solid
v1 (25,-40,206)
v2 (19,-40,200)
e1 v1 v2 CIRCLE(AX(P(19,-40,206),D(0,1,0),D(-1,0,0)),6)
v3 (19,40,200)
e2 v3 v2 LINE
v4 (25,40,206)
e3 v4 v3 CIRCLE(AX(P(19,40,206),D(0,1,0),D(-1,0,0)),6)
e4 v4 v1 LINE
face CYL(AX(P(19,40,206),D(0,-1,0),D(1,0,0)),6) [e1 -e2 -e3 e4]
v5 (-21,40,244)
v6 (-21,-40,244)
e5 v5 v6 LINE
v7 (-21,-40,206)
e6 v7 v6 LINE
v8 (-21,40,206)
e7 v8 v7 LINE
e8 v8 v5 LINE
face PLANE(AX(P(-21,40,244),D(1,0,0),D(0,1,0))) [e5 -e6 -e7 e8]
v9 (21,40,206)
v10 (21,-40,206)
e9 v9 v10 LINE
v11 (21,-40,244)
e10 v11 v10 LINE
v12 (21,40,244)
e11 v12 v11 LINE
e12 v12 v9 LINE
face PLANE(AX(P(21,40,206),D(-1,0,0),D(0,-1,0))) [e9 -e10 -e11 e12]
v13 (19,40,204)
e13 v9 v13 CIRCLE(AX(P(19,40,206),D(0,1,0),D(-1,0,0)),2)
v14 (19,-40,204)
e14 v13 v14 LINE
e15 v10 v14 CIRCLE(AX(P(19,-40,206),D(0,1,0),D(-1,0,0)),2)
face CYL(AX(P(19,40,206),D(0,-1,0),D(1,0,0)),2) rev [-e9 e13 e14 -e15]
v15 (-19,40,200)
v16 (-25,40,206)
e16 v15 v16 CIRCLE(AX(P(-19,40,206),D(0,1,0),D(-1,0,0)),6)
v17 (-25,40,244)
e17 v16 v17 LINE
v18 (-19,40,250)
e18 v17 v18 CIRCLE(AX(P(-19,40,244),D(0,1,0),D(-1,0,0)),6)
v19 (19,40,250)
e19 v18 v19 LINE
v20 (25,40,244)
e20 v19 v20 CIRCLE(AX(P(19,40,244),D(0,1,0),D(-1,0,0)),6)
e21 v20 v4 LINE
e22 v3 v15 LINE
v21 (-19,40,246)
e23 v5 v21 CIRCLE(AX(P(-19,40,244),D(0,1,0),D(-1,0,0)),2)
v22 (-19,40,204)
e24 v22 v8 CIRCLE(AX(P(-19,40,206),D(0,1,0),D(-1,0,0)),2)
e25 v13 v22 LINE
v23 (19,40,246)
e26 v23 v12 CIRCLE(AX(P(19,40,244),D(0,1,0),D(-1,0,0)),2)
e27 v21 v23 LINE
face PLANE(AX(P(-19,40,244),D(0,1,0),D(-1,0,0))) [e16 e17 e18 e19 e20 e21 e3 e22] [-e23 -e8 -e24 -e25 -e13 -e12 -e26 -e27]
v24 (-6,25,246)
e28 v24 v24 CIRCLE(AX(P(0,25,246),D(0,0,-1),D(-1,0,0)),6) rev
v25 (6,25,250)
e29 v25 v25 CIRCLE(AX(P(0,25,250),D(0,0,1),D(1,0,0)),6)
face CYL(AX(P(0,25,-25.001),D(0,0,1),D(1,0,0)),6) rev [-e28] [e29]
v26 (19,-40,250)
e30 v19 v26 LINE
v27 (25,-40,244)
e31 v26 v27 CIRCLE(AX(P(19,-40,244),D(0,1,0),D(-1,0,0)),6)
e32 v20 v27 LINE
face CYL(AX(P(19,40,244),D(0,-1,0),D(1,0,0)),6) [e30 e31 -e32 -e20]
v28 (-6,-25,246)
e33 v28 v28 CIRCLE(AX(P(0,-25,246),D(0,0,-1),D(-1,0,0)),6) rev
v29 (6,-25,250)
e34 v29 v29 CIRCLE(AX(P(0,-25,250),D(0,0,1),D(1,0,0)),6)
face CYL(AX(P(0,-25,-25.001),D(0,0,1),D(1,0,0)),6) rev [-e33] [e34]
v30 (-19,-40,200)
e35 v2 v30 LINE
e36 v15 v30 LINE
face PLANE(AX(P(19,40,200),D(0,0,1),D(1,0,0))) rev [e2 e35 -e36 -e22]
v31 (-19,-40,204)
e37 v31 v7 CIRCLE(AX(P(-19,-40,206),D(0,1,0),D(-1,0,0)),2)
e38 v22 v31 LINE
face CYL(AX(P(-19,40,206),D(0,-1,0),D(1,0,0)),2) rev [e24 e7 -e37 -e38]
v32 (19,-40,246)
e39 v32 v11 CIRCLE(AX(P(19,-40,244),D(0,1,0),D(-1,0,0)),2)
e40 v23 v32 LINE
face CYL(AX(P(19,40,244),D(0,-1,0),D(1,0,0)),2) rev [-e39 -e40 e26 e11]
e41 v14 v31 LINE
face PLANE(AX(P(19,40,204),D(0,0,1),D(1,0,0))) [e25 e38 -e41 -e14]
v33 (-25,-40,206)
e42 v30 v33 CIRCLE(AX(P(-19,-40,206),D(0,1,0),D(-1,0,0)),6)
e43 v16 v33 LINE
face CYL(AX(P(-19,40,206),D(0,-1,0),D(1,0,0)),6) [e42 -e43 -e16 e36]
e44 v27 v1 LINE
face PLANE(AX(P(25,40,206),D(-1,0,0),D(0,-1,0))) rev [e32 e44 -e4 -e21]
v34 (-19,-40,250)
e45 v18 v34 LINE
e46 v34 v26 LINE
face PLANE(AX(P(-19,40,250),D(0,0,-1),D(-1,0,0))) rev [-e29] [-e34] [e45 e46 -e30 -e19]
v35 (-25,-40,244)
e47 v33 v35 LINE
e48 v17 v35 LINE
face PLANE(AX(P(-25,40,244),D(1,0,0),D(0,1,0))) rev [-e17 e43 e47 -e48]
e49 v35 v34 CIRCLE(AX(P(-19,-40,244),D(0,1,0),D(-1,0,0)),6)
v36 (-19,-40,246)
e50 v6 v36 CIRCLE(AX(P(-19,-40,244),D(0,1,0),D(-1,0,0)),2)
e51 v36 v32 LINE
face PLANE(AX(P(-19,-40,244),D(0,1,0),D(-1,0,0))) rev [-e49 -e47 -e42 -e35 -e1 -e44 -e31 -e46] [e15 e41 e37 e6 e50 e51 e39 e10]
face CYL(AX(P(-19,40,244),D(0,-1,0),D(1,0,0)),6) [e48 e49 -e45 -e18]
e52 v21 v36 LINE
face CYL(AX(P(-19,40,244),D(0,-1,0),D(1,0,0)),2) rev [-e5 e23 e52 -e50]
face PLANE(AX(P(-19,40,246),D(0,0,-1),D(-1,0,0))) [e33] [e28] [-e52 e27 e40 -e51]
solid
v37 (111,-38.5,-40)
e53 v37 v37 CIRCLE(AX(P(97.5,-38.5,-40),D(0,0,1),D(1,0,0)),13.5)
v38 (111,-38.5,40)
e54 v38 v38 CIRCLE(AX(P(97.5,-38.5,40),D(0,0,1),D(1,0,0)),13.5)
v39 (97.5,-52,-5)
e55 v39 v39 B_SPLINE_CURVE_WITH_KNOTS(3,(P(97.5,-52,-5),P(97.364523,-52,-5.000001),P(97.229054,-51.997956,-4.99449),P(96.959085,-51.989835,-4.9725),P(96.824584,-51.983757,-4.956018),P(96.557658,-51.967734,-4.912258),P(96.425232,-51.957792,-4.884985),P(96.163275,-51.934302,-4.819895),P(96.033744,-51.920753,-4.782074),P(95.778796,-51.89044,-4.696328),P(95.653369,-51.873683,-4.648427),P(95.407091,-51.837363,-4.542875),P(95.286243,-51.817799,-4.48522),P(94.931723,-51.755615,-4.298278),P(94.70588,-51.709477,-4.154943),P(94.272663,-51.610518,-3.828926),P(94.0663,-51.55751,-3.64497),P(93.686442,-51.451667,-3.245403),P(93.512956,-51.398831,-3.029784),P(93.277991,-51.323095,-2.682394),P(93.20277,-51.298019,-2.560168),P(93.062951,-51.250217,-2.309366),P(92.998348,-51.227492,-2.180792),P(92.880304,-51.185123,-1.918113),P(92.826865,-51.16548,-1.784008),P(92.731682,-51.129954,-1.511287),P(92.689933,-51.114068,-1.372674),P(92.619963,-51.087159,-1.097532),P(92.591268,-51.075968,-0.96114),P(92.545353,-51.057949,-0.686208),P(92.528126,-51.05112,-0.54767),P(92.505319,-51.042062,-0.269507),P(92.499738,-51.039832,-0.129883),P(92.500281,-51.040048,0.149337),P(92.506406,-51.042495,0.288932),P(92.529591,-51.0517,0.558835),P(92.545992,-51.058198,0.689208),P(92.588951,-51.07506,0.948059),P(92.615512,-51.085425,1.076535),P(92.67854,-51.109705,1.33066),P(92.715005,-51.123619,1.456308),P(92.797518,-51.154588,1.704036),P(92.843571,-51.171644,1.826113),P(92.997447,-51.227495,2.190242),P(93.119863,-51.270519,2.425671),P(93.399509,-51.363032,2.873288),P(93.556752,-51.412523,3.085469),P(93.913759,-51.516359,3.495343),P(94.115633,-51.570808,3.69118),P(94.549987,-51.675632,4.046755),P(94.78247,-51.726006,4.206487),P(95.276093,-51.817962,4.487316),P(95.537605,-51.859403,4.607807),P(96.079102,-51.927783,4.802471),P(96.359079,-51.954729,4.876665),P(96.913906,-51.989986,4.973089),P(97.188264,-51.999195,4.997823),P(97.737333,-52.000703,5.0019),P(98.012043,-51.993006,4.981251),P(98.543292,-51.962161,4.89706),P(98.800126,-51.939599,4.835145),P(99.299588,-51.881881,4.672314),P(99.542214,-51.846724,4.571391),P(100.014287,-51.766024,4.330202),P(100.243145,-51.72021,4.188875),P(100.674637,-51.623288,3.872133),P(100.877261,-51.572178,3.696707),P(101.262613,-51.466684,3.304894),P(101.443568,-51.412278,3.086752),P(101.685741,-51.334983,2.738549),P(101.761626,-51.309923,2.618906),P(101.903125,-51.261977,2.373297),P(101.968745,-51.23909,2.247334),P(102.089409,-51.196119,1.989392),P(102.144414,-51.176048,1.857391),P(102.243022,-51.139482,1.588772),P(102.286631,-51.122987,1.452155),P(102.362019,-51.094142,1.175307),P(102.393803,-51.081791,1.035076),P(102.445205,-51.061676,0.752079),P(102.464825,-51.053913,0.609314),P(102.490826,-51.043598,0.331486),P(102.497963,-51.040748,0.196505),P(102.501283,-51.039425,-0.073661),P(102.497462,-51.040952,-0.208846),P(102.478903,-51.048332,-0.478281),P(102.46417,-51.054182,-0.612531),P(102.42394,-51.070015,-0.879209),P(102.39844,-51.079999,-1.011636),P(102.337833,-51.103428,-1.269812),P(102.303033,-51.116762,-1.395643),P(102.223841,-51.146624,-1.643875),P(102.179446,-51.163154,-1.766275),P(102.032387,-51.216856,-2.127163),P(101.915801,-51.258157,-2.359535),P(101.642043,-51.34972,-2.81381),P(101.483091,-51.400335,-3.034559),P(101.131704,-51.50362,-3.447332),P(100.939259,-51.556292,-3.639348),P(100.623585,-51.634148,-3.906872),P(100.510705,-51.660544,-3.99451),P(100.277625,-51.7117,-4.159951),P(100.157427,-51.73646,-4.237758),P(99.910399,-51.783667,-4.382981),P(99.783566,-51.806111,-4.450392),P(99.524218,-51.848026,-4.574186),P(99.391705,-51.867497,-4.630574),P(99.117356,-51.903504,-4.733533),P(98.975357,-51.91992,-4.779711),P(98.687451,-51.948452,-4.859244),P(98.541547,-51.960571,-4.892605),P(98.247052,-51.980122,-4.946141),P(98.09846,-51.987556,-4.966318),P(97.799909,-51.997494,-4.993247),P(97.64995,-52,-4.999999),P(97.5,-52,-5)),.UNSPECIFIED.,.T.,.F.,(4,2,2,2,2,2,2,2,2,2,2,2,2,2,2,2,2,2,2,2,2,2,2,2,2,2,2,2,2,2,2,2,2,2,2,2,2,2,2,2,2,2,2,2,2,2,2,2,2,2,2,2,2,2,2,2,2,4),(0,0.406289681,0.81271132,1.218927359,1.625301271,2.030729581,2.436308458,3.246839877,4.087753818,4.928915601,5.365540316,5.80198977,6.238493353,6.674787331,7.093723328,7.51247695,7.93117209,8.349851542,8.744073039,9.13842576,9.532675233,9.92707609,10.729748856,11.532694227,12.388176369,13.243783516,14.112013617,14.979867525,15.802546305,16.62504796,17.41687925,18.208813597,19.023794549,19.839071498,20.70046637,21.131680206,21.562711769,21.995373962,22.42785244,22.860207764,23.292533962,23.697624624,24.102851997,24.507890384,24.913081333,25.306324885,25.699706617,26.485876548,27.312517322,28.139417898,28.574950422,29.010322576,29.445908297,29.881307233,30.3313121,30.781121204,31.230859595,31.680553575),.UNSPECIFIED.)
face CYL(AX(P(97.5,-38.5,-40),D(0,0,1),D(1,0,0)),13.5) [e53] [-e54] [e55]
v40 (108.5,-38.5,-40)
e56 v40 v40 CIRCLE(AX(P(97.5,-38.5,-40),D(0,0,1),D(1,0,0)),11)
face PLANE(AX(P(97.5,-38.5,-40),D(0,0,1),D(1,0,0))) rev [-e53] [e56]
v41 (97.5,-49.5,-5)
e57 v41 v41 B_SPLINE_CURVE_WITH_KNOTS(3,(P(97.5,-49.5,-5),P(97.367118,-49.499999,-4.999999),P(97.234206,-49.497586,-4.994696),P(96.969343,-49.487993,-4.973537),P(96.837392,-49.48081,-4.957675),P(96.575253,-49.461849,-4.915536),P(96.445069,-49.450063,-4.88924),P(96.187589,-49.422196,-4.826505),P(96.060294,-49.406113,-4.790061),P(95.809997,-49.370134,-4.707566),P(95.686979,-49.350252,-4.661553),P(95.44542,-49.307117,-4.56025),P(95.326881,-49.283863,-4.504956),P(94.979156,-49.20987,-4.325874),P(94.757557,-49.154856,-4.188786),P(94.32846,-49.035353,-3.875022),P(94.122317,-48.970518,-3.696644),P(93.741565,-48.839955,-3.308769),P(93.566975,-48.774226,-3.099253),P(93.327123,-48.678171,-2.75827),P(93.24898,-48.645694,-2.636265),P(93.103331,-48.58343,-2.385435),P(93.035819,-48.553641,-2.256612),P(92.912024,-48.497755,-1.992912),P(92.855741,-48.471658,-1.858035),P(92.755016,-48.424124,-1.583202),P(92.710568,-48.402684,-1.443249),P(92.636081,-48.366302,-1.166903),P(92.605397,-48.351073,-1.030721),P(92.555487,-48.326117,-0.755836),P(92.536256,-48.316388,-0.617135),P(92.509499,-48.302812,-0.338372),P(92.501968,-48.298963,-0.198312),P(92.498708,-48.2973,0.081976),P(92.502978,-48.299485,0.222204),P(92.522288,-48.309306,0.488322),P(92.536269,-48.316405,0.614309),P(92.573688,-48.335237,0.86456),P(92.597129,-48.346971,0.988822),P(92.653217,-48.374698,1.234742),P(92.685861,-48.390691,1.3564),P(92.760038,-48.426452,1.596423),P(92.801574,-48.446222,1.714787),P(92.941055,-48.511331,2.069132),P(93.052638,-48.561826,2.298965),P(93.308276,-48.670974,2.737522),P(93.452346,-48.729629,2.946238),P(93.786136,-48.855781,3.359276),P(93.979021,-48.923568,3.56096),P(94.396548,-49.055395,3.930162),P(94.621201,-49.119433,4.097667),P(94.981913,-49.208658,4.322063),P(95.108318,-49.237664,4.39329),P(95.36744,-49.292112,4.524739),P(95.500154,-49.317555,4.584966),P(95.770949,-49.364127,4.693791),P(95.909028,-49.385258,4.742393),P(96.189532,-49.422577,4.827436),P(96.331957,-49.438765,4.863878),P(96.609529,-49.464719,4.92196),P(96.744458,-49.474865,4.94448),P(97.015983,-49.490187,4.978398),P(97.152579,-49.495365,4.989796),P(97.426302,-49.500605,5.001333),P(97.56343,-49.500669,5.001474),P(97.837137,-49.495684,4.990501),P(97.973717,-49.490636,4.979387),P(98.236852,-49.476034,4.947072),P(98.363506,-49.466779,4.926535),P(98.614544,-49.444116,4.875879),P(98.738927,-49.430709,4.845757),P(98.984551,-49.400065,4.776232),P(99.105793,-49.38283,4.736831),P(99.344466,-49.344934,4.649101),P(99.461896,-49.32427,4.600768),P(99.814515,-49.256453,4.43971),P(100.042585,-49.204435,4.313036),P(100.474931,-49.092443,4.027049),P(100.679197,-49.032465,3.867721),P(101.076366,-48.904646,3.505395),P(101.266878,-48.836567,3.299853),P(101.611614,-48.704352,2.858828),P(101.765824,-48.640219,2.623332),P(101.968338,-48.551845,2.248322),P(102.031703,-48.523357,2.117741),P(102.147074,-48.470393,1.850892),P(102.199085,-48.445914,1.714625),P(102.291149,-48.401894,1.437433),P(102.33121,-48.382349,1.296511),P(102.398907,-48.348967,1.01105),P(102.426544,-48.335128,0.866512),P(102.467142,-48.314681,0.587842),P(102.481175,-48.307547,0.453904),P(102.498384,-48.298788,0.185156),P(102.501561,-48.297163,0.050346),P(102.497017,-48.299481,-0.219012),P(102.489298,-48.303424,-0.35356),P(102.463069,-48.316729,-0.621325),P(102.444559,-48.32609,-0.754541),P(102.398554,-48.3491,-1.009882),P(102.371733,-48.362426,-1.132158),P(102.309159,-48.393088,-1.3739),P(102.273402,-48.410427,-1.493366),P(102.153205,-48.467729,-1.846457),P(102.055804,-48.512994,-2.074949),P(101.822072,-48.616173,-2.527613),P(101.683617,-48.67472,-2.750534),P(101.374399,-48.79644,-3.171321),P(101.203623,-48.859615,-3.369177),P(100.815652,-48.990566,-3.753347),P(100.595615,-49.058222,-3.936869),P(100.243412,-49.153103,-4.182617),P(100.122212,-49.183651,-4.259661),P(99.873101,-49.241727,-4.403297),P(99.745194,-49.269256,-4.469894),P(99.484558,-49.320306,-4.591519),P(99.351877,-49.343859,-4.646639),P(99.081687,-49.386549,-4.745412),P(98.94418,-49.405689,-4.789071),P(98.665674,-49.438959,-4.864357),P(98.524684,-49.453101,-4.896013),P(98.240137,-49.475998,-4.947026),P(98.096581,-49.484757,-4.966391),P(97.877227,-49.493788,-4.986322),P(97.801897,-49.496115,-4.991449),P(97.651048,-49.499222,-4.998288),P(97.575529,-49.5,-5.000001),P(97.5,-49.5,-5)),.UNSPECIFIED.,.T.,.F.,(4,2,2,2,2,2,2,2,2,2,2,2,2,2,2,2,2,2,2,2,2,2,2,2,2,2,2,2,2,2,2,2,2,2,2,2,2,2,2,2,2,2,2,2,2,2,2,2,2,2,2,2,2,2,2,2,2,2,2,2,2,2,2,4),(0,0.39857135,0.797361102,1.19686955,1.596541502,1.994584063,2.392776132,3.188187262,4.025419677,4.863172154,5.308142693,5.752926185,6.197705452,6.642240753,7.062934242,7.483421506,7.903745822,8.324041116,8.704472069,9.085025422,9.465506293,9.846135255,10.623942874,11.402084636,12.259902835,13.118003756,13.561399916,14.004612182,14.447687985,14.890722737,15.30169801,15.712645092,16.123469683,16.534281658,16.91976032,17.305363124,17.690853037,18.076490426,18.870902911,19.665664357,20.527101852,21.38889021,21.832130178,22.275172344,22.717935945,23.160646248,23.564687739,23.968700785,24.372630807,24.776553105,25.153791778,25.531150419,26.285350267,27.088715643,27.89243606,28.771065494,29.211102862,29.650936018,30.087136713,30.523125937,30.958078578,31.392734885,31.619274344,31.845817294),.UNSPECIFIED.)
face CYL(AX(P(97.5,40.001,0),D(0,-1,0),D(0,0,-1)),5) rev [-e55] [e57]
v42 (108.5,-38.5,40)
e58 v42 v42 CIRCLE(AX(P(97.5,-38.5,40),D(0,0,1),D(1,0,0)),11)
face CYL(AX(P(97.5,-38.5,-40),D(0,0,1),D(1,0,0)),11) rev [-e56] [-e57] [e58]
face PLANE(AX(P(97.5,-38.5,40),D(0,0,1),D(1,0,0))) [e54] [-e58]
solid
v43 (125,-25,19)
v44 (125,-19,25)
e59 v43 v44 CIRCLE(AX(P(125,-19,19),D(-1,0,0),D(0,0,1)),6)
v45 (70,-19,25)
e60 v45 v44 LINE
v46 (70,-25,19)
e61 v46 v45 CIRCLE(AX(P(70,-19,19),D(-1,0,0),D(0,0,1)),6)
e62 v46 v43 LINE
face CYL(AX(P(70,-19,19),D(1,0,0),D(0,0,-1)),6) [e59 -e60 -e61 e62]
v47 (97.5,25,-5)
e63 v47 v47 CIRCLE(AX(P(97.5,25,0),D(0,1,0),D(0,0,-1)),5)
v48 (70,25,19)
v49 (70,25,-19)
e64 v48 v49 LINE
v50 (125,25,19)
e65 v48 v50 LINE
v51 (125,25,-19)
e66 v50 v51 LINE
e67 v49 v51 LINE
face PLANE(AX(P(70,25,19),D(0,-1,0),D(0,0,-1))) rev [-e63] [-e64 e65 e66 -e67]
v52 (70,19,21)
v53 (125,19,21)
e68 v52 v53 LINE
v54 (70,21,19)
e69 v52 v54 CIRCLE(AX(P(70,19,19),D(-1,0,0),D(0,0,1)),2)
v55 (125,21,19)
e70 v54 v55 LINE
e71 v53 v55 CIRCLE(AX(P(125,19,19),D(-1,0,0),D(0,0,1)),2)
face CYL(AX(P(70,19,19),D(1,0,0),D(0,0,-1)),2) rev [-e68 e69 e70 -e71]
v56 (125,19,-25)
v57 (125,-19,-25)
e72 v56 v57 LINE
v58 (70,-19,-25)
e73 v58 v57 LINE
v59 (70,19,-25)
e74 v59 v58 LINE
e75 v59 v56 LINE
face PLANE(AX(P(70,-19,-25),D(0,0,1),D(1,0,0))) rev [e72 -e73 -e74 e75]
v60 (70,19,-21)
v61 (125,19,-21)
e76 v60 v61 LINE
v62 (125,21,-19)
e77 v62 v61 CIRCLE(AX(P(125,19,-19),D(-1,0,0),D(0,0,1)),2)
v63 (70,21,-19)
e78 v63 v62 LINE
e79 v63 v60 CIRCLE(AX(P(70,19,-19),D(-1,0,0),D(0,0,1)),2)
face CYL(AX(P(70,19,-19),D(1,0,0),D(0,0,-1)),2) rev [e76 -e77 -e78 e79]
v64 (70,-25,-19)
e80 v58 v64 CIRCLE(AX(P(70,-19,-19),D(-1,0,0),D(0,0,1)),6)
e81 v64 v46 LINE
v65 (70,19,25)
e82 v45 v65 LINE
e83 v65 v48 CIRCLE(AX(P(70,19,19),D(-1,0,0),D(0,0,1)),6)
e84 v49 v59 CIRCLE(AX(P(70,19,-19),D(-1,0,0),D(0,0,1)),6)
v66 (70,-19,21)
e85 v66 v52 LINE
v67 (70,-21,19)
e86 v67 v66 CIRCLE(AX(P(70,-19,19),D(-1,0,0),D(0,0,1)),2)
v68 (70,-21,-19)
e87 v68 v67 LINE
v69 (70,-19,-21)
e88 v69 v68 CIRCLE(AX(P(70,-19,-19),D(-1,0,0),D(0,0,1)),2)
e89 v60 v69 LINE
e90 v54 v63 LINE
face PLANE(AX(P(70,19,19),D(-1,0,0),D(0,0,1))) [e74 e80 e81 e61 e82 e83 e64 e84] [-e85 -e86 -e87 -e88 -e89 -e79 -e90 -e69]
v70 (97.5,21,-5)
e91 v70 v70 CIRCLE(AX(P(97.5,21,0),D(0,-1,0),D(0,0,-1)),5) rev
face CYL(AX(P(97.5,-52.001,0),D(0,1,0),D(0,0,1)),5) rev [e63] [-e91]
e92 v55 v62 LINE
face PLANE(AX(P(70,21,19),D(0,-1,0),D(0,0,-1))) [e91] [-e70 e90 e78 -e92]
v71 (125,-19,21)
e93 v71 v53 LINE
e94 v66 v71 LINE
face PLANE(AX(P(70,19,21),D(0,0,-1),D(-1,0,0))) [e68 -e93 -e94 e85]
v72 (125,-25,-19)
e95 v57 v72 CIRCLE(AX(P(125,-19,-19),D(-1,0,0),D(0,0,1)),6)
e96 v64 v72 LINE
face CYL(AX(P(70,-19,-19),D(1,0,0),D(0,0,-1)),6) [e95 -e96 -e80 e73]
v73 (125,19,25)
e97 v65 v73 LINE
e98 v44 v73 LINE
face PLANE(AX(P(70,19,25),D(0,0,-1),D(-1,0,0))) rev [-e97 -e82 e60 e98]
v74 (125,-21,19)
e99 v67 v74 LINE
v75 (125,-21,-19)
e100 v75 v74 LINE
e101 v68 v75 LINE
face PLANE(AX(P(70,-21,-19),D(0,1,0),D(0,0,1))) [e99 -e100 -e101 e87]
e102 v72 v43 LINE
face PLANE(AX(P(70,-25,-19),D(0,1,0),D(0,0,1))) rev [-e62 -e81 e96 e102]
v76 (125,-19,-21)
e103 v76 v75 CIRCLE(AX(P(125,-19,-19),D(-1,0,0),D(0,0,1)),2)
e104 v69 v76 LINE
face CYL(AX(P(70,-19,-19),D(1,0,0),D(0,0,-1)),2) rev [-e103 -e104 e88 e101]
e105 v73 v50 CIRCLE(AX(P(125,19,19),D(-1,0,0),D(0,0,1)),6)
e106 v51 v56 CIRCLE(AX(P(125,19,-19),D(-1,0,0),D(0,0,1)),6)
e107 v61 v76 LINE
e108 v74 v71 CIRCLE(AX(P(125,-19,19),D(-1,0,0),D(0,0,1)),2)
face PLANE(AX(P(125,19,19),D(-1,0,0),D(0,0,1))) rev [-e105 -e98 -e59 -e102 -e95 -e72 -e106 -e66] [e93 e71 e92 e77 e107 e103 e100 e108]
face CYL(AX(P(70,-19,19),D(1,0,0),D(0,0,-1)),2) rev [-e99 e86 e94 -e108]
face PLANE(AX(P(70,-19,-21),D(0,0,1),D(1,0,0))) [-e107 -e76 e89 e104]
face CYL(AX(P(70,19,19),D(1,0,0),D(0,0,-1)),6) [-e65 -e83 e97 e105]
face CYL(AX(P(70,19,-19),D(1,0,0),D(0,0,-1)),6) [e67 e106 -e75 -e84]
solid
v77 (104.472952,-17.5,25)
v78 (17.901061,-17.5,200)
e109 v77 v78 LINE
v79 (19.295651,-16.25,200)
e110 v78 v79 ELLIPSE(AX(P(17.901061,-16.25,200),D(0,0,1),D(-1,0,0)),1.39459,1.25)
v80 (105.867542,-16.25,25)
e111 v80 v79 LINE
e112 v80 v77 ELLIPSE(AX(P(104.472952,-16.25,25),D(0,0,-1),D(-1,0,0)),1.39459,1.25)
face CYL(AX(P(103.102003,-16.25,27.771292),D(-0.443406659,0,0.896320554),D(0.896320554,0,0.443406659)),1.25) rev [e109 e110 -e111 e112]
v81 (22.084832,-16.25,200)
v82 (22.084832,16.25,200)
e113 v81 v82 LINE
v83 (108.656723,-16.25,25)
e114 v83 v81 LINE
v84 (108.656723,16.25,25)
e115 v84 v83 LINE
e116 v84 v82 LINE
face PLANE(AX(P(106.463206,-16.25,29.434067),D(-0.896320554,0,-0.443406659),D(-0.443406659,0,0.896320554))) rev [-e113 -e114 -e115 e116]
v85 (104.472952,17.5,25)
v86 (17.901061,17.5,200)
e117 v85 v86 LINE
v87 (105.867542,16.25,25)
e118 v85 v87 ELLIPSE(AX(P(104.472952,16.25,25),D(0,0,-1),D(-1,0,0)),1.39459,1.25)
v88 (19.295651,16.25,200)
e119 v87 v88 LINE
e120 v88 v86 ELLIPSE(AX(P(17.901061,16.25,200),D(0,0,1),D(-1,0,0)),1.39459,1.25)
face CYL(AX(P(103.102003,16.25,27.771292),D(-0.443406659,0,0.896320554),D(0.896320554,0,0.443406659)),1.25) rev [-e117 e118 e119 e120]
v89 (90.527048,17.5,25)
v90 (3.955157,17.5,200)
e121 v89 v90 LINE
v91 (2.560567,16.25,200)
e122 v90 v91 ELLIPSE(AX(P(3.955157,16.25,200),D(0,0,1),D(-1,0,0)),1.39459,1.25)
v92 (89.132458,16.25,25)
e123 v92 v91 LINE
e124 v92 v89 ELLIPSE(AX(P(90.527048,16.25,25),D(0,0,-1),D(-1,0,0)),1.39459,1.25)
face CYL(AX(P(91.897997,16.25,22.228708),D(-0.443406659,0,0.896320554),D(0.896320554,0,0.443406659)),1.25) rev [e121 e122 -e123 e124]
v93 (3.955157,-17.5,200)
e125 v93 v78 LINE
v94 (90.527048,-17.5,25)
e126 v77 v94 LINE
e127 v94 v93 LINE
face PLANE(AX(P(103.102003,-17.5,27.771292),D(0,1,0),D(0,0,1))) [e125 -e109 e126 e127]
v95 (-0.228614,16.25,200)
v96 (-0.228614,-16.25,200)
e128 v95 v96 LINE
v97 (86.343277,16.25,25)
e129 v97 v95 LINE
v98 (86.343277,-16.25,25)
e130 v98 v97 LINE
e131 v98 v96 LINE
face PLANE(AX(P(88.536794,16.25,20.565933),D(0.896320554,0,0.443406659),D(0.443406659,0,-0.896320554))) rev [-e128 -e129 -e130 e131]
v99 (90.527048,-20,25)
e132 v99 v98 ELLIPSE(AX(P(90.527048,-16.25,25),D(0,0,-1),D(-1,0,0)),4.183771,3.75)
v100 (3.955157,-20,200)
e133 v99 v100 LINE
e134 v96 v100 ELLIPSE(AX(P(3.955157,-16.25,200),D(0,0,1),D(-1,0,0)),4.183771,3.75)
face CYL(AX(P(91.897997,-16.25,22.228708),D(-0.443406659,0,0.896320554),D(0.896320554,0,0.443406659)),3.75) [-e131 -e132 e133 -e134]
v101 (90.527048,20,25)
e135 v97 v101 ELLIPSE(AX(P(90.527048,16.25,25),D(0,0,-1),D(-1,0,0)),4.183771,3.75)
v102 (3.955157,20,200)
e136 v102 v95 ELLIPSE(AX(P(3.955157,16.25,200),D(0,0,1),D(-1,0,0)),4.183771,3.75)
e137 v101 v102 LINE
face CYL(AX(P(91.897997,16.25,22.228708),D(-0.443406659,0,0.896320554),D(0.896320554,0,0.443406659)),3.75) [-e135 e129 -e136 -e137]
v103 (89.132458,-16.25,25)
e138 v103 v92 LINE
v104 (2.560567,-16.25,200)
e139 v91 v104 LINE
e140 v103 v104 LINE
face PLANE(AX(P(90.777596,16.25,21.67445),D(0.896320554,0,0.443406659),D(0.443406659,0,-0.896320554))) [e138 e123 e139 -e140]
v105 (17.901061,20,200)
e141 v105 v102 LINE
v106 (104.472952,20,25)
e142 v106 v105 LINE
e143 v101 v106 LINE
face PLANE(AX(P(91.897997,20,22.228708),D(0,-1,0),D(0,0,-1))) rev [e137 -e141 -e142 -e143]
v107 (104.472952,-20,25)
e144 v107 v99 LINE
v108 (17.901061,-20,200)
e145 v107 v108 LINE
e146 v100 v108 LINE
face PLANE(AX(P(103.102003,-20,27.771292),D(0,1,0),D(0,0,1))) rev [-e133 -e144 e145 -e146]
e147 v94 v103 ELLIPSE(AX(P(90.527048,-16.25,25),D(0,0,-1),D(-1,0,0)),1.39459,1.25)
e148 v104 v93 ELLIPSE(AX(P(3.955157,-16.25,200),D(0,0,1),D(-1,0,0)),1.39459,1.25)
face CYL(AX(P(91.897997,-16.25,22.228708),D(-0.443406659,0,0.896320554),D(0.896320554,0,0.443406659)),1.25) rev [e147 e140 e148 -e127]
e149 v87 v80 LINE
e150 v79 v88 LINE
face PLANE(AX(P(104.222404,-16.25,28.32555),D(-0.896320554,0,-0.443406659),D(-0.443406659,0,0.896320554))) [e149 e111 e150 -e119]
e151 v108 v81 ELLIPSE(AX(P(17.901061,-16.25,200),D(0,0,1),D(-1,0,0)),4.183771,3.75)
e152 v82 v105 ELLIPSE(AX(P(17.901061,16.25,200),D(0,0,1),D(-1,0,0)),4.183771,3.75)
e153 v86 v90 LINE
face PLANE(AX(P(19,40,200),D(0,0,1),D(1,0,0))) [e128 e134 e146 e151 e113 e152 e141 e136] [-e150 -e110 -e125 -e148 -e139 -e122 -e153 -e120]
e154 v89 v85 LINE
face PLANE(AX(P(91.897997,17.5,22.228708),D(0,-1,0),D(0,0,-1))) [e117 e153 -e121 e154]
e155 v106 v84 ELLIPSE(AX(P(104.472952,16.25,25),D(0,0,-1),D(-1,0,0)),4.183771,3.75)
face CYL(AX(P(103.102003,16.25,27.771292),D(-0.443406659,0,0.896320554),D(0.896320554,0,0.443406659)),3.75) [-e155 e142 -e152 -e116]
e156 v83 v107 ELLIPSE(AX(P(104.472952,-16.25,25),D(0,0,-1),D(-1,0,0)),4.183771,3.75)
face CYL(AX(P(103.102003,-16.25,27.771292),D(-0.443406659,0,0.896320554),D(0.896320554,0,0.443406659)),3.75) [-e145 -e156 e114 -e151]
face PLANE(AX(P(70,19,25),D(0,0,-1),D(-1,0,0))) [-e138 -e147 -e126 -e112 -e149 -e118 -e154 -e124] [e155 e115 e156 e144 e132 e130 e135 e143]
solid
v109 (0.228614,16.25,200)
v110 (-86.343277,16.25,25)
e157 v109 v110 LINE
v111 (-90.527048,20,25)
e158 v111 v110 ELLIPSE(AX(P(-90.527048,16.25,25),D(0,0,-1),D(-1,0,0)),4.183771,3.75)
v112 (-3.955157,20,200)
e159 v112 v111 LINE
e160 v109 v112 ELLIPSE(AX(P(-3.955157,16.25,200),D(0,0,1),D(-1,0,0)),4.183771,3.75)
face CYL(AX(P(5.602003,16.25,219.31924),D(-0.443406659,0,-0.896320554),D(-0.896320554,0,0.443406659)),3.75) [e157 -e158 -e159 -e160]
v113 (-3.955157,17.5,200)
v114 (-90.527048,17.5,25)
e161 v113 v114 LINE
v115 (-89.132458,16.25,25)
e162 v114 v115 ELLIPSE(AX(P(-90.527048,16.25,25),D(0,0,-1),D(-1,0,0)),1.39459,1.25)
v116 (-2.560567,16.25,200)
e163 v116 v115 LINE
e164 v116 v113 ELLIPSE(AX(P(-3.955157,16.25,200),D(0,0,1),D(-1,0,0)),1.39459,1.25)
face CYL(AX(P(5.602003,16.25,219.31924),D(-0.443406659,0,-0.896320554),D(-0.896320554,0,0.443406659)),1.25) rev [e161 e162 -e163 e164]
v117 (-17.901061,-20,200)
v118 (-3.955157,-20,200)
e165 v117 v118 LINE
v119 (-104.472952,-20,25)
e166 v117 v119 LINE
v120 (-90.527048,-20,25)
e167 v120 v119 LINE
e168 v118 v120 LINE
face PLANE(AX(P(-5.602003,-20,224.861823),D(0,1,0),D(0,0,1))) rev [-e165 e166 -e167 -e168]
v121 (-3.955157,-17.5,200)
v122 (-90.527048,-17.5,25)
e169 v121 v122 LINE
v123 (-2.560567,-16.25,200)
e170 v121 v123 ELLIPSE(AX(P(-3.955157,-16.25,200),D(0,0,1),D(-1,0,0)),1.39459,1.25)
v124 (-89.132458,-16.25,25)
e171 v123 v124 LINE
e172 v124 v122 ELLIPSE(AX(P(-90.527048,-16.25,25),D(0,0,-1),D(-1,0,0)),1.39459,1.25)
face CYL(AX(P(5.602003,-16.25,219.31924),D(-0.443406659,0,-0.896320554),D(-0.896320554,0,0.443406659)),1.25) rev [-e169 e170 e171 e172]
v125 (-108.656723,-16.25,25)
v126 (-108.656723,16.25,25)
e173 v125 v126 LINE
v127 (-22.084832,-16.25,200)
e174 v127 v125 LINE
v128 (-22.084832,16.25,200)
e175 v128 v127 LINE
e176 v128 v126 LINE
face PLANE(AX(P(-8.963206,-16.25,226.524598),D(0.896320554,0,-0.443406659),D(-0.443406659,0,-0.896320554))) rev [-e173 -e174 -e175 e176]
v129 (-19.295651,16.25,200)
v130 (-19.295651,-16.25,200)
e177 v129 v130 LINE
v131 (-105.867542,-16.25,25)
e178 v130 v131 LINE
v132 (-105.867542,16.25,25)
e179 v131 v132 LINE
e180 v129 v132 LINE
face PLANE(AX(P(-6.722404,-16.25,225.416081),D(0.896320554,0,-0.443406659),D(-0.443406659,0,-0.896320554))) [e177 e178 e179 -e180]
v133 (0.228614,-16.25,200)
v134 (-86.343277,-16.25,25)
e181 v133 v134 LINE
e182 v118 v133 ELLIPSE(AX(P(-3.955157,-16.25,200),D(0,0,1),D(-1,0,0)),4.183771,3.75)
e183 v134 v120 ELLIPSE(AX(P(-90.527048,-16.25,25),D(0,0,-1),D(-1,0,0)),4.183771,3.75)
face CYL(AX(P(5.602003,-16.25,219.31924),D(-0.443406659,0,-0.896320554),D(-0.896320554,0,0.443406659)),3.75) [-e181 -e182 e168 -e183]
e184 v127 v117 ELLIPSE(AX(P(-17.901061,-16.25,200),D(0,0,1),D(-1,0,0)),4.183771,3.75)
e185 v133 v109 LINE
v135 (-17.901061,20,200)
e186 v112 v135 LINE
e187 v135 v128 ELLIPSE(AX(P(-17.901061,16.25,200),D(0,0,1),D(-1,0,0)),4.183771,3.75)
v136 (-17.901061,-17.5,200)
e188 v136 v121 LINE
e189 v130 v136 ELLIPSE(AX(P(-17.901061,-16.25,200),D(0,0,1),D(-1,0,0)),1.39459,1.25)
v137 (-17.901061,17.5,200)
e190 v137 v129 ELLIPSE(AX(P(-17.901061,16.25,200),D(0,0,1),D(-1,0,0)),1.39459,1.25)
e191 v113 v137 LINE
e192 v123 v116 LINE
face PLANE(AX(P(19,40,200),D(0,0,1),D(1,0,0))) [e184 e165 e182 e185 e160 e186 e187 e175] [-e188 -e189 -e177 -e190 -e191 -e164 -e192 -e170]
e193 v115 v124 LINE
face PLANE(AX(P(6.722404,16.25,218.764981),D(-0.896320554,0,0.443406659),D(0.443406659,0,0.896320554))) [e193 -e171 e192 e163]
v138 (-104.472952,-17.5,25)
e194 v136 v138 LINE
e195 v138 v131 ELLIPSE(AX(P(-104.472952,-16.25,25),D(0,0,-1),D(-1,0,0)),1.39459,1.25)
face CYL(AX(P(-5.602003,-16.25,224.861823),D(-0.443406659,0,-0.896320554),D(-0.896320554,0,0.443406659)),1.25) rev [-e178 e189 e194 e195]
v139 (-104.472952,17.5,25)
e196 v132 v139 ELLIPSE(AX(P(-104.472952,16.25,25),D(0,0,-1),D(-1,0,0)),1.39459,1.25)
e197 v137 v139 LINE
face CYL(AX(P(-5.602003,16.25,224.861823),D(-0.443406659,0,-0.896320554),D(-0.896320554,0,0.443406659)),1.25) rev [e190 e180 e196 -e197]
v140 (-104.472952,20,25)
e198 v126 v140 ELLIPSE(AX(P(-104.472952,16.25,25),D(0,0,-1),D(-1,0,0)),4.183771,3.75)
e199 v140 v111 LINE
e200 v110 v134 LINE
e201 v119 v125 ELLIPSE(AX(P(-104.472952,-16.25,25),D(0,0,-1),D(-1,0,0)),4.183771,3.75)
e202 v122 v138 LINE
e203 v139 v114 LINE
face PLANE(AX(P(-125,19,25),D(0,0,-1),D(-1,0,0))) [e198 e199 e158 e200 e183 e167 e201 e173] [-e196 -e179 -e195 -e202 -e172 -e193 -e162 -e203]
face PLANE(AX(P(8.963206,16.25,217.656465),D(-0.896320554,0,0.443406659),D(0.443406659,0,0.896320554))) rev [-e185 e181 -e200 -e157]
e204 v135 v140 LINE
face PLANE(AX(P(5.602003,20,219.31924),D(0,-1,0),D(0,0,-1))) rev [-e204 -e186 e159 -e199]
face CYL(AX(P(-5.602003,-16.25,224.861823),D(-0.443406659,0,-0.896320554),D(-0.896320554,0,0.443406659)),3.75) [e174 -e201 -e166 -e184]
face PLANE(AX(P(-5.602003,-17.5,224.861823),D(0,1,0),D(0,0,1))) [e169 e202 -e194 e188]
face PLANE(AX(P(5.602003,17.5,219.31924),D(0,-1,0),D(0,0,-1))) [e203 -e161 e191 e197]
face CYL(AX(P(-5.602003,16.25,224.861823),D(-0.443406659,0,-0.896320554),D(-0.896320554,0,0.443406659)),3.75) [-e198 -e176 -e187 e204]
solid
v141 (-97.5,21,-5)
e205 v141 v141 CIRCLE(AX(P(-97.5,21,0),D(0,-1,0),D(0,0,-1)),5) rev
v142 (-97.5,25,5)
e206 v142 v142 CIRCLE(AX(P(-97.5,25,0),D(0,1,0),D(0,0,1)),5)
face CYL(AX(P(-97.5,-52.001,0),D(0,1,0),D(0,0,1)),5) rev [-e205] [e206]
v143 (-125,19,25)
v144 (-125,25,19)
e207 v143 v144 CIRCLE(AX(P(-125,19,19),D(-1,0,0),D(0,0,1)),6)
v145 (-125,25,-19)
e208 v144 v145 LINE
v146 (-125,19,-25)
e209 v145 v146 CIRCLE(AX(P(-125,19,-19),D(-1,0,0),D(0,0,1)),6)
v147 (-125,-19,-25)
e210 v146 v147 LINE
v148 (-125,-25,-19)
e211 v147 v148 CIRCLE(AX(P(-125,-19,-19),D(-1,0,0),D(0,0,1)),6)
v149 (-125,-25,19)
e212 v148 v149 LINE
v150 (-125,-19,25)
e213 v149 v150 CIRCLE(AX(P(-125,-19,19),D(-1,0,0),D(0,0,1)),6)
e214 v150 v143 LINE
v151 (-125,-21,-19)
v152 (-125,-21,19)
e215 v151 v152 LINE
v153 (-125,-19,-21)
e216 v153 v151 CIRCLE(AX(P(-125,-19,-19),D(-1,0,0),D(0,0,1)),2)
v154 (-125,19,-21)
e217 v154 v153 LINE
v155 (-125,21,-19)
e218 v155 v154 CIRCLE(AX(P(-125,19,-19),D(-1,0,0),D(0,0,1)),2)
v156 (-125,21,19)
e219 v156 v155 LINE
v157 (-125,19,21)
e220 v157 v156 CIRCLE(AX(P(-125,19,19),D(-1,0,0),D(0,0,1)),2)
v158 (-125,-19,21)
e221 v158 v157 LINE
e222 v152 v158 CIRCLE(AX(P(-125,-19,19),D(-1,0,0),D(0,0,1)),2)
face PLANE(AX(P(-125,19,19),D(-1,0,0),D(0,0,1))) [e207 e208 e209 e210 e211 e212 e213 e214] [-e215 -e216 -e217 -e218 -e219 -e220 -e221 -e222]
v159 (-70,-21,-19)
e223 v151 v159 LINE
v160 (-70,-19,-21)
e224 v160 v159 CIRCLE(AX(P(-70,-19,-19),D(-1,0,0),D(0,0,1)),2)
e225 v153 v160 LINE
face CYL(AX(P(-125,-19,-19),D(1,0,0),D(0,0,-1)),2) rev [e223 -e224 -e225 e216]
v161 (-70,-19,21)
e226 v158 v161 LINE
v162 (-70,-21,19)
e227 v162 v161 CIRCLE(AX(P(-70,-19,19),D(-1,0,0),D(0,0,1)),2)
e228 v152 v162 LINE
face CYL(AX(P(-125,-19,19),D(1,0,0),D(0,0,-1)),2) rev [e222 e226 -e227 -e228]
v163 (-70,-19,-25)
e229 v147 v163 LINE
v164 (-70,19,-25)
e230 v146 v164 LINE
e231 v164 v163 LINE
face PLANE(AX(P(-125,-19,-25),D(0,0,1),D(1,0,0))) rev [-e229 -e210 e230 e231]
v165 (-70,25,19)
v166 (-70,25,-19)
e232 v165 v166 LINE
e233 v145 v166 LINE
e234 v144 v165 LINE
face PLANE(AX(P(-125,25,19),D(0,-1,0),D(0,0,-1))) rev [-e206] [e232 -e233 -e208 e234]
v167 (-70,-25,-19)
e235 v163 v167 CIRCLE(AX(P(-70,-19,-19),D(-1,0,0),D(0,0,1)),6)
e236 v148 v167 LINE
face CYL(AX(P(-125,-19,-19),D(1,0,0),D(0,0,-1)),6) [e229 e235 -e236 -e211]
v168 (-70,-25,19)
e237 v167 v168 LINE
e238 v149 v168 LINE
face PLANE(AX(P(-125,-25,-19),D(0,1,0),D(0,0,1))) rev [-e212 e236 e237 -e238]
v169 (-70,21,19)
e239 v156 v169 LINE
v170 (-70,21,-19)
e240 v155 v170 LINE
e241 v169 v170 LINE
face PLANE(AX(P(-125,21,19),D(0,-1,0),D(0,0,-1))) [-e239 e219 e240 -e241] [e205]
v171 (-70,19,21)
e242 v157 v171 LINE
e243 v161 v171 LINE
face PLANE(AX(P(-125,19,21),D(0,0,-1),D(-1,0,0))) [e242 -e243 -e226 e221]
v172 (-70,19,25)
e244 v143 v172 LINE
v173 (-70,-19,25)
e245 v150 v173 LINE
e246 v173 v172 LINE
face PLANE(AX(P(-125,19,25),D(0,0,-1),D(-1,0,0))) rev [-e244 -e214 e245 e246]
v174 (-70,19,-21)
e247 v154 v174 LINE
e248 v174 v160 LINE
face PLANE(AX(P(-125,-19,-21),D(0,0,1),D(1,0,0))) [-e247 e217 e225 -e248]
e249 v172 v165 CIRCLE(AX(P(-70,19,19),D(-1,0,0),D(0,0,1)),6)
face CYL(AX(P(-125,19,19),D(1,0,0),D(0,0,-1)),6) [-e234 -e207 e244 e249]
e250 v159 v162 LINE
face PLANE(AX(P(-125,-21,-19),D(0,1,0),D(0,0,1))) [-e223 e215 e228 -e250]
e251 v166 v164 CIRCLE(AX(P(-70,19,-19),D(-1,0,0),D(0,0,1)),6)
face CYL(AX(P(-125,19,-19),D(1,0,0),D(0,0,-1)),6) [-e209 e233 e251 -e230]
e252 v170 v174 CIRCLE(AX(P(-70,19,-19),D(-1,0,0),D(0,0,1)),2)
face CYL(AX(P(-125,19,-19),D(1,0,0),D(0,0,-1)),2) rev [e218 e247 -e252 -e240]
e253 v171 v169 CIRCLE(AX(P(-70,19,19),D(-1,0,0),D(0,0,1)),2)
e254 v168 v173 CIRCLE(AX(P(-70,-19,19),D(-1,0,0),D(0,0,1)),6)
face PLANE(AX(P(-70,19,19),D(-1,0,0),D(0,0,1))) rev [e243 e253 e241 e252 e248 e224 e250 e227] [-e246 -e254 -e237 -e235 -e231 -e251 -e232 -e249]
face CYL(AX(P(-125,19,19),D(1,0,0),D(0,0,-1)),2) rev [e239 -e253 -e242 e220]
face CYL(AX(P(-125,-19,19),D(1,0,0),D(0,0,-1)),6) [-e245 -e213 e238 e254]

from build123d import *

# Parameters (mm, degrees)
BXBXS_8639_82_50_X_50_X_4_1_DEPTH     = 55
BXBXS_8639_82_50_X_50_X_4_1_2_DEPTH   = 55
AXBXS_8645_68_40_X_20_X_2_5_1_DEPTH   = 266.089245937
AXBXS_8645_68_40_X_20_X_2_5_1_2_DEPTH = 266.089245937
BODY_START                            = 266.089246039
BODY_4_RUN_ON_DEPTH                   = 57.009711
BODY_START_2                          = -2e-09
BODY_3_RUN_ON_DEPTH                   = 57.009711
BXBXS_8639_82_50_X_50_X_4_2_DEPTH     = 80
BODY_START_3                          = 150.660137769
BODY_3_RUN_ON_2_DEPTH                 = 102.6688631
BODY_START_4                          = 115.429108279
BODY_4_RUN_ON_2_DEPTH                 = 102.6688631
SKETCH_9_R                            = 6
CUT_EXTRUDE_1_DEPTH                   = 4
EXTRUDE_1_DEPTH                       = 40
EXTRUDE_1_DEPTH_BACK                  = 40
SKETCH_10_R                           = 13.5
SKETCH_10_R_2                         = 11
CUT_EXTRUDE_2_REACH                   = 296.26
CUT_EXTRUDE_2_END_RADIUS              = 11
SKETCH_11_R                           = 5
SKETCH_12_R                           = 5
CUT_EXTRUDE_3_DEPTH                   = 4


with BuildPart() as part:
    # Sketch1 → Труба bxbxs гост8639-82 50 X 50 X 4(1) (new body)
    with BuildSketch(Plane.ZY.offset(70)):
        with BuildLine():
            Line((-19, -25), (19, -25))
            ThreePointArc((19, -25), (23.242640687, -23.242640687), (25, -19))
            Line((25, -19), (25, 19))
            ThreePointArc((25, 19), (23.242640687, 23.242640687), (19, 25))
            Line((19, 25), (-19, 25))
            ThreePointArc((-19, 25), (-23.242640687, 23.242640687), (-25, 19))
            Line((-25, 19), (-25, -19))
            ThreePointArc((-25, -19), (-23.242640687, -23.242640687), (-19, -25))
        make_face()
        with BuildLine():
            Line((-19, -21), (19, -21))
            ThreePointArc((19, -21), (20.414213562, -20.414213562), (21, -19))
            Line((21, -19), (21, 19))
            ThreePointArc((21, 19), (20.414213562, 20.414213562), (19, 21))
            Line((19, 21), (-19, 21))
            ThreePointArc((-19, 21), (-20.414213562, 20.414213562), (-21, 19))
            Line((-21, 19), (-21, -19))
            ThreePointArc((-21, -19), (-20.414213562, -20.414213562), (-19, -21))
        make_face(mode=Mode.SUBTRACT)
    extrude(amount=BXBXS_8639_82_50_X_50_X_4_1_DEPTH)


with BuildPart() as body_2:
    # Sketch1 on segment 2 (carried to segment 2) → bxbxs _8639-82 50 X 50 X 4_1 2 (new body)
    with BuildSketch(Plane.ZY.offset(-125)):
        with BuildLine():
            Line((-19, -25), (19, -25))
            ThreePointArc((19, -25), (23.242640687, -23.242640687), (25, -19))
            Line((25, -19), (25, 19))
            ThreePointArc((25, 19), (23.242640687, 23.242640687), (19, 25))
            Line((19, 25), (-19, 25))
            ThreePointArc((-19, 25), (-23.242640687, 23.242640687), (-25, 19))
            Line((-25, 19), (-25, -19))
            ThreePointArc((-25, -19), (-23.242640687, -23.242640687), (-19, -25))
        make_face()
        with BuildLine():
            Line((-19, -21), (19, -21))
            ThreePointArc((19, -21), (20.414213562, -20.414213562), (21, -19))
            Line((21, -19), (21, 19))
            ThreePointArc((21, 19), (20.414213562, 20.414213562), (19, 21))
            Line((19, 21), (-19, 21))
            ThreePointArc((-19, 21), (-20.414213562, 20.414213562), (-21, 19))
            Line((-21, 19), (-21, -19))
            ThreePointArc((-21, -19), (-20.414213562, -20.414213562), (-19, -21))
        make_face(mode=Mode.SUBTRACT)
    extrude(amount=BXBXS_8639_82_50_X_50_X_4_1_2_DEPTH)


with BuildPart() as body_3:
    # Sketch11 → Труба axbxs гост8645-68 40 X 20 X 2.5(1) (new body)
    with BuildSketch(Plane(origin=(-97.5, 0, 25), x_dir=(0.8963205535774442, 0, -0.44340665898768833), z_dir=(0.44340665898768833, 0, 0.8963205535774442))):
        with BuildLine():
            Line((-6.25, -20), (6.25, -20))
            ThreePointArc((6.25, -20), (8.901650429, -18.901650429), (10, -16.25))
            Line((10, -16.25), (10, 16.25))
            ThreePointArc((10, 16.25), (8.901650429, 18.901650429), (6.25, 20))
            Line((6.25, 20), (-6.25, 20))
            ThreePointArc((-6.25, 20), (-8.901650429, 18.901650429), (-10, 16.25))
            Line((-10, 16.25), (-10, -16.25))
            ThreePointArc((-10, -16.25), (-8.901650429, -18.901650429), (-6.25, -20))
        make_face()
        with BuildLine():
            Line((-6.25, -17.5), (6.25, -17.5))
            ThreePointArc((6.25, -17.5), (7.133883476, -17.133883476), (7.5, -16.25))
            Line((7.5, -16.25), (7.5, 16.25))
            ThreePointArc((7.5, 16.25), (7.133883476, 17.133883476), (6.25, 17.5))
            Line((6.25, 17.5), (-6.25, 17.5))
            ThreePointArc((-6.25, 17.5), (-7.133883476, 17.133883476), (-7.5, 16.25))
            Line((-7.5, 16.25), (-7.5, -16.25))
            ThreePointArc((-7.5, -16.25), (-7.133883476, -17.133883476), (-6.25, -17.5))
        make_face(mode=Mode.SUBTRACT)
    extrude(amount=AXBXS_8645_68_40_X_20_X_2_5_1_DEPTH)

    # Труба axbxs гост8645-68 40 X 20 X 2.5(1) mitre 1
    split(bisect_by=Plane(origin=(0, 0, 222.090531237), x_dir=(0, -1, 0), z_dir=(-1, 0, 0)), keep=Keep.TOP)

    # Sketch11 → body 3 run on (add)
    with BuildSketch(Plane(origin=(-97.5, 0, 25), x_dir=(0.8963205535774442, 0, -0.44340665898768833), z_dir=(0.44340665898768833, 0, 0.8963205535774442)).offset(BODY_START_2)):
        with BuildLine():
            Line((-6.25, -20), (6.25, -20))
            ThreePointArc((6.25, -20), (8.901650429, -18.901650429), (10, -16.25))
            Line((10, -16.25), (10, 16.25))
            ThreePointArc((10, 16.25), (8.901650429, 18.901650429), (6.25, 20))
            Line((6.25, 20), (-6.25, 20))
            ThreePointArc((-6.25, 20), (-8.901650429, 18.901650429), (-10, 16.25))
            Line((-10, 16.25), (-10, -16.25))
            ThreePointArc((-10, -16.25), (-8.901650429, -18.901650429), (-6.25, -20))
        make_face()
        with BuildLine():
            Line((-6.25, -17.5), (6.25, -17.5))
            ThreePointArc((6.25, -17.5), (7.133883476, -17.133883476), (7.5, -16.25))
            Line((7.5, -16.25), (7.5, 16.25))
            ThreePointArc((7.5, 16.25), (7.133883476, 17.133883476), (6.25, 17.5))
            Line((6.25, 17.5), (-6.25, 17.5))
            ThreePointArc((-6.25, 17.5), (-7.133883476, 17.133883476), (-7.5, 16.25))
            Line((-7.5, 16.25), (-7.5, -16.25))
            ThreePointArc((-7.5, -16.25), (-7.133883476, -17.133883476), (-6.25, -17.5))
        make_face(mode=Mode.SUBTRACT)
    extrude(amount=-BODY_3_RUN_ON_DEPTH)

    # Weld Trim 3 5
    split(bisect_by=Plane(origin=(-97.5, 0, 25), x_dir=(0, -1, 0), z_dir=(0, 0, 1)), keep=Keep.TOP)

    # body 3 cut square before the run-on
    split(bisect_by=Plane(origin=(-30.696291668, 0, 160.03977815), x_dir=(0, -1, 0), z_dir=(-0.443406659, 0, -0.896320554)), keep=Keep.TOP)

    # Sketch11 → body 3 run on 2 (add)
    with BuildSketch(Plane(origin=(-97.5, 0, 25), x_dir=(0.8963205535774442, 0, -0.44340665898768833), z_dir=(0.44340665898768833, 0, 0.8963205535774442)).offset(BODY_START_3)):
        with BuildLine():
            Line((-6.25, -20), (6.25, -20))
            ThreePointArc((6.25, -20), (8.901650429, -18.901650429), (10, -16.25))
            Line((10, -16.25), (10, 16.25))
            ThreePointArc((10, 16.25), (8.901650429, 18.901650429), (6.25, 20))
            Line((6.25, 20), (-6.25, 20))
            ThreePointArc((-6.25, 20), (-8.901650429, 18.901650429), (-10, 16.25))
            Line((-10, 16.25), (-10, -16.25))
            ThreePointArc((-10, -16.25), (-8.901650429, -18.901650429), (-6.25, -20))
        make_face()
        with BuildLine():
            Line((-6.25, -17.5), (6.25, -17.5))
            ThreePointArc((6.25, -17.5), (7.133883476, -17.133883476), (7.5, -16.25))
            Line((7.5, -16.25), (7.5, 16.25))
            ThreePointArc((7.5, 16.25), (7.133883476, 17.133883476), (6.25, 17.5))
            Line((6.25, 17.5), (-6.25, 17.5))
            ThreePointArc((-6.25, 17.5), (-7.133883476, 17.133883476), (-7.5, 16.25))
            Line((-7.5, 16.25), (-7.5, -16.25))
            ThreePointArc((-7.5, -16.25), (-7.133883476, -17.133883476), (-6.25, -17.5))
        make_face(mode=Mode.SUBTRACT)
    extrude(amount=BODY_3_RUN_ON_2_DEPTH)

    # Weld Trim 4
    split(bisect_by=Plane.YX.offset(-200), keep=Keep.TOP)


with BuildPart() as body_4:
    # Sketch11 on segment 2 (carried to segment 2) → axbxs _8645-68 40 X 20 X 2.5_1 2 (new body)
    with BuildSketch(Plane(origin=(-20.485743533, 0, 263.501260219), x_dir=(-0.896320554, 0, -0.443406659), z_dir=(0.443406659, 0, -0.896320554))):
        with BuildLine():
            Line((-6.25, -20), (6.25, -20))
            ThreePointArc((6.25, -20), (8.901650429, -18.901650429), (10, -16.25))
            Line((10, -16.25), (10, 16.25))
            ThreePointArc((10, 16.25), (8.901650429, 18.901650429), (6.25, 20))
            Line((6.25, 20), (-6.25, 20))
            ThreePointArc((-6.25, 20), (-8.901650429, 18.901650429), (-10, 16.25))
            Line((-10, 16.25), (-10, -16.25))
            ThreePointArc((-10, -16.25), (-8.901650429, -18.901650429), (-6.25, -20))
        make_face()
        with BuildLine():
            Line((-6.25, -17.5), (6.25, -17.5))
            ThreePointArc((6.25, -17.5), (7.133883476, -17.133883476), (7.5, -16.25))
            Line((7.5, -16.25), (7.5, 16.25))
            ThreePointArc((7.5, 16.25), (7.133883476, 17.133883476), (6.25, 17.5))
            Line((6.25, 17.5), (-6.25, 17.5))
            ThreePointArc((-6.25, 17.5), (-7.133883476, 17.133883476), (-7.5, 16.25))
            Line((-7.5, 16.25), (-7.5, -16.25))
            ThreePointArc((-7.5, -16.25), (-7.133883476, -17.133883476), (-6.25, -17.5))
        make_face(mode=Mode.SUBTRACT)
    extrude(amount=AXBXS_8645_68_40_X_20_X_2_5_1_2_DEPTH)

    # axbxs _8645-68 40 X 20 X 2.5_1 2 mitre 1
    split(bisect_by=Plane(origin=(0, 0, 222.090531237), x_dir=(0, 1, 0), z_dir=(1, 0, 0)), keep=Keep.TOP)

    # Sketch11 on segment 2 (carried to segment 2) → body 4 run on (add)
    with BuildSketch(Plane(origin=(-20.485743533, 0, 263.501260219), x_dir=(-0.896320554, 0, -0.443406659), z_dir=(0.443406659, 0, -0.896320554)).offset(BODY_START)):
        with BuildLine():
            Line((-6.25, -20), (6.25, -20))
            ThreePointArc((6.25, -20), (8.901650429, -18.901650429), (10, -16.25))
            Line((10, -16.25), (10, 16.25))
            ThreePointArc((10, 16.25), (8.901650429, 18.901650429), (6.25, 20))
            Line((6.25, 20), (-6.25, 20))
            ThreePointArc((-6.25, 20), (-8.901650429, 18.901650429), (-10, 16.25))
            Line((-10, 16.25), (-10, -16.25))
            ThreePointArc((-10, -16.25), (-8.901650429, -18.901650429), (-6.25, -20))
        make_face()
        with BuildLine():
            Line((-6.25, -17.5), (6.25, -17.5))
            ThreePointArc((6.25, -17.5), (7.133883476, -17.133883476), (7.5, -16.25))
            Line((7.5, -16.25), (7.5, 16.25))
            ThreePointArc((7.5, 16.25), (7.133883476, 17.133883476), (6.25, 17.5))
            Line((6.25, 17.5), (-6.25, 17.5))
            ThreePointArc((-6.25, 17.5), (-7.133883476, 17.133883476), (-7.5, 16.25))
            Line((-7.5, 16.25), (-7.5, -16.25))
            ThreePointArc((-7.5, -16.25), (-7.133883476, -17.133883476), (-6.25, -17.5))
        make_face(mode=Mode.SUBTRACT)
    extrude(amount=BODY_4_RUN_ON_DEPTH)

    # Weld Trim 2 5
    split(bisect_by=Plane(origin=(97.5, 0, 25), x_dir=(0, -1, 0), z_dir=(0, 0, 1)), keep=Keep.TOP)

    # body 4 cut square before the run-on
    split(bisect_by=Plane(origin=(30.69629172, 0, 160.039777939), x_dir=(0, 1, 0), z_dir=(0.443406659, 0, -0.896320554)), keep=Keep.TOP)

    # Sketch11 on segment 2 (carried to segment 2) → body 4 run on 2 (add)
    with BuildSketch(Plane(origin=(-20.485743533, 0, 263.501260219), x_dir=(-0.896320554, 0, -0.443406659), z_dir=(0.443406659, 0, -0.896320554)).offset(BODY_START_4)):
        with BuildLine():
            Line((-6.25, -20), (6.25, -20))
            ThreePointArc((6.25, -20), (8.901650429, -18.901650429), (10, -16.25))
            Line((10, -16.25), (10, 16.25))
            ThreePointArc((10, 16.25), (8.901650429, 18.901650429), (6.25, 20))
            Line((6.25, 20), (-6.25, 20))
            ThreePointArc((-6.25, 20), (-8.901650429, 18.901650429), (-10, 16.25))
            Line((-10, 16.25), (-10, -16.25))
            ThreePointArc((-10, -16.25), (-8.901650429, -18.901650429), (-6.25, -20))
        make_face()
        with BuildLine():
            Line((-6.25, -17.5), (6.25, -17.5))
            ThreePointArc((6.25, -17.5), (7.133883476, -17.133883476), (7.5, -16.25))
            Line((7.5, -16.25), (7.5, 16.25))
            ThreePointArc((7.5, 16.25), (7.133883476, 17.133883476), (6.25, 17.5))
            Line((6.25, 17.5), (-6.25, 17.5))
            ThreePointArc((-6.25, 17.5), (-7.133883476, 17.133883476), (-7.5, 16.25))
            Line((-7.5, 16.25), (-7.5, -16.25))
            ThreePointArc((-7.5, -16.25), (-7.133883476, -17.133883476), (-6.25, -17.5))
        make_face(mode=Mode.SUBTRACT)
    extrude(amount=-BODY_4_RUN_ON_2_DEPTH)

    # Weld Trim 4
    split(bisect_by=Plane.YX.offset(-200), keep=Keep.TOP)


with BuildPart() as body_5:
    # Sketch12 → Труба bxbxs гост8639-82 50 X 50 X 4(2) (new body)
    with BuildSketch(Plane(origin=(0, -40, 225), x_dir=(-1, 0, 0), z_dir=(0, 1, 0))):
        with BuildLine():
            Line((-19, -25), (19, -25))
            ThreePointArc((19, -25), (23.242640687, -23.242640687), (25, -19))
            Line((25, -19), (25, 19))
            ThreePointArc((25, 19), (23.242640687, 23.242640687), (19, 25))
            Line((19, 25), (-19, 25))
            ThreePointArc((-19, 25), (-23.242640687, 23.242640687), (-25, 19))
            Line((-25, 19), (-25, -19))
            ThreePointArc((-25, -19), (-23.242640687, -23.242640687), (-19, -25))
        make_face()
        with BuildLine():
            Line((-19, -21), (19, -21))
            ThreePointArc((19, -21), (20.414213562, -20.414213562), (21, -19))
            Line((21, -19), (21, 19))
            ThreePointArc((21, 19), (20.414213562, 20.414213562), (19, 21))
            Line((19, 21), (-19, 21))
            ThreePointArc((-19, 21), (-20.414213562, 20.414213562), (-21, 19))
            Line((-21, 19), (-21, -19))
            ThreePointArc((-21, -19), (-20.414213562, -20.414213562), (-19, -21))
        make_face(mode=Mode.SUBTRACT)
    extrude(amount=BXBXS_8639_82_50_X_50_X_4_2_DEPTH)

    # Эскиз9 → Вырез-Вытянуть1 (cut)
    with BuildSketch(Plane.XY.offset(250)):
        with Locations((0, 25)):
            Circle(SKETCH_9_R)
        with Locations((0, -25)):
            Circle(SKETCH_9_R)
    extrude(amount=-CUT_EXTRUDE_1_DEPTH, mode=Mode.SUBTRACT)


with BuildPart() as body_6:
    # Эскиз10 → Бобышка-Вытянуть1 (new, two sides: drawn at the far end of the back side and taken through both)
    with BuildSketch(Plane.XY.offset(-EXTRUDE_1_DEPTH_BACK)):
        with Locations((97.5, -38.5)):
            Circle(SKETCH_10_R)
        with Locations((97.5, -38.5)):
            Circle(SKETCH_10_R_2, mode=Mode.SUBTRACT)
    extrude(amount=EXTRUDE_1_DEPTH + EXTRUDE_1_DEPTH_BACK)

    # Вырез-Вытянуть2: up to this cylinder (the profile starts outside it)
    cut_extrude_2_end = Plane(origin=(97.5, -38.5, 0), z_dir=(0, 0, 1)) * Cylinder(CUT_EXTRUDE_2_END_RADIUS, 615.52, mode=Mode.PRIVATE)
    # Эскиз11 → Вырез-Вытянуть2 (cut, up to the surface)
    with BuildSketch(Plane(origin=(0, -52, 0), x_dir=(-1, 0, 0), z_dir=(0, -1, 0)), mode=Mode.PRIVATE) as cut_extrude_2_sk1:
        with Locations(Location((-97.5, 0, 0), (0, 0, 90))):
            Circle(SKETCH_11_R)
    cut_extrude_2_tool1 = extrude(cut_extrude_2_sk1.sketch, amount=-CUT_EXTRUDE_2_REACH, mode=Mode.PRIVATE) - cut_extrude_2_end
    add(cut_extrude_2_tool1.solids().sort_by_distance((97.5, -52, 0))[0], mode=Mode.SUBTRACT)


with BuildPart() as cut_extrude_3_tool:
    # Эскиз12 → Вырез-Вытянуть3 (new body)
    with BuildSketch(Plane(origin=(0, 25, 0), x_dir=(1, 0, 0), z_dir=(0, 1, 0))):
        with Locations(Location((-97.5, 0, 0), (0, 0, 270))):
            Circle(SKETCH_12_R)
        with Locations(Location((97.5, 0, 0), (0, 0, 90))):
            Circle(SKETCH_12_R)
    extrude(amount=-CUT_EXTRUDE_3_DEPTH)


with BuildPart() as part_1:
    add(part.part)

    # Вырез-Вытянуть3: cut by cut_extrude_3_tool
    add(cut_extrude_3_tool.part, mode=Mode.SUBTRACT)


with BuildPart() as body_2_1:
    add(body_2.part)

    # Вырез-Вытянуть3: cut by cut_extrude_3_tool
    add(cut_extrude_3_tool.part, mode=Mode.SUBTRACT)


solid = Compound([body_3.part, body_4.part, body_5.part, body_6.part, part_1.part, body_2_1.part])
